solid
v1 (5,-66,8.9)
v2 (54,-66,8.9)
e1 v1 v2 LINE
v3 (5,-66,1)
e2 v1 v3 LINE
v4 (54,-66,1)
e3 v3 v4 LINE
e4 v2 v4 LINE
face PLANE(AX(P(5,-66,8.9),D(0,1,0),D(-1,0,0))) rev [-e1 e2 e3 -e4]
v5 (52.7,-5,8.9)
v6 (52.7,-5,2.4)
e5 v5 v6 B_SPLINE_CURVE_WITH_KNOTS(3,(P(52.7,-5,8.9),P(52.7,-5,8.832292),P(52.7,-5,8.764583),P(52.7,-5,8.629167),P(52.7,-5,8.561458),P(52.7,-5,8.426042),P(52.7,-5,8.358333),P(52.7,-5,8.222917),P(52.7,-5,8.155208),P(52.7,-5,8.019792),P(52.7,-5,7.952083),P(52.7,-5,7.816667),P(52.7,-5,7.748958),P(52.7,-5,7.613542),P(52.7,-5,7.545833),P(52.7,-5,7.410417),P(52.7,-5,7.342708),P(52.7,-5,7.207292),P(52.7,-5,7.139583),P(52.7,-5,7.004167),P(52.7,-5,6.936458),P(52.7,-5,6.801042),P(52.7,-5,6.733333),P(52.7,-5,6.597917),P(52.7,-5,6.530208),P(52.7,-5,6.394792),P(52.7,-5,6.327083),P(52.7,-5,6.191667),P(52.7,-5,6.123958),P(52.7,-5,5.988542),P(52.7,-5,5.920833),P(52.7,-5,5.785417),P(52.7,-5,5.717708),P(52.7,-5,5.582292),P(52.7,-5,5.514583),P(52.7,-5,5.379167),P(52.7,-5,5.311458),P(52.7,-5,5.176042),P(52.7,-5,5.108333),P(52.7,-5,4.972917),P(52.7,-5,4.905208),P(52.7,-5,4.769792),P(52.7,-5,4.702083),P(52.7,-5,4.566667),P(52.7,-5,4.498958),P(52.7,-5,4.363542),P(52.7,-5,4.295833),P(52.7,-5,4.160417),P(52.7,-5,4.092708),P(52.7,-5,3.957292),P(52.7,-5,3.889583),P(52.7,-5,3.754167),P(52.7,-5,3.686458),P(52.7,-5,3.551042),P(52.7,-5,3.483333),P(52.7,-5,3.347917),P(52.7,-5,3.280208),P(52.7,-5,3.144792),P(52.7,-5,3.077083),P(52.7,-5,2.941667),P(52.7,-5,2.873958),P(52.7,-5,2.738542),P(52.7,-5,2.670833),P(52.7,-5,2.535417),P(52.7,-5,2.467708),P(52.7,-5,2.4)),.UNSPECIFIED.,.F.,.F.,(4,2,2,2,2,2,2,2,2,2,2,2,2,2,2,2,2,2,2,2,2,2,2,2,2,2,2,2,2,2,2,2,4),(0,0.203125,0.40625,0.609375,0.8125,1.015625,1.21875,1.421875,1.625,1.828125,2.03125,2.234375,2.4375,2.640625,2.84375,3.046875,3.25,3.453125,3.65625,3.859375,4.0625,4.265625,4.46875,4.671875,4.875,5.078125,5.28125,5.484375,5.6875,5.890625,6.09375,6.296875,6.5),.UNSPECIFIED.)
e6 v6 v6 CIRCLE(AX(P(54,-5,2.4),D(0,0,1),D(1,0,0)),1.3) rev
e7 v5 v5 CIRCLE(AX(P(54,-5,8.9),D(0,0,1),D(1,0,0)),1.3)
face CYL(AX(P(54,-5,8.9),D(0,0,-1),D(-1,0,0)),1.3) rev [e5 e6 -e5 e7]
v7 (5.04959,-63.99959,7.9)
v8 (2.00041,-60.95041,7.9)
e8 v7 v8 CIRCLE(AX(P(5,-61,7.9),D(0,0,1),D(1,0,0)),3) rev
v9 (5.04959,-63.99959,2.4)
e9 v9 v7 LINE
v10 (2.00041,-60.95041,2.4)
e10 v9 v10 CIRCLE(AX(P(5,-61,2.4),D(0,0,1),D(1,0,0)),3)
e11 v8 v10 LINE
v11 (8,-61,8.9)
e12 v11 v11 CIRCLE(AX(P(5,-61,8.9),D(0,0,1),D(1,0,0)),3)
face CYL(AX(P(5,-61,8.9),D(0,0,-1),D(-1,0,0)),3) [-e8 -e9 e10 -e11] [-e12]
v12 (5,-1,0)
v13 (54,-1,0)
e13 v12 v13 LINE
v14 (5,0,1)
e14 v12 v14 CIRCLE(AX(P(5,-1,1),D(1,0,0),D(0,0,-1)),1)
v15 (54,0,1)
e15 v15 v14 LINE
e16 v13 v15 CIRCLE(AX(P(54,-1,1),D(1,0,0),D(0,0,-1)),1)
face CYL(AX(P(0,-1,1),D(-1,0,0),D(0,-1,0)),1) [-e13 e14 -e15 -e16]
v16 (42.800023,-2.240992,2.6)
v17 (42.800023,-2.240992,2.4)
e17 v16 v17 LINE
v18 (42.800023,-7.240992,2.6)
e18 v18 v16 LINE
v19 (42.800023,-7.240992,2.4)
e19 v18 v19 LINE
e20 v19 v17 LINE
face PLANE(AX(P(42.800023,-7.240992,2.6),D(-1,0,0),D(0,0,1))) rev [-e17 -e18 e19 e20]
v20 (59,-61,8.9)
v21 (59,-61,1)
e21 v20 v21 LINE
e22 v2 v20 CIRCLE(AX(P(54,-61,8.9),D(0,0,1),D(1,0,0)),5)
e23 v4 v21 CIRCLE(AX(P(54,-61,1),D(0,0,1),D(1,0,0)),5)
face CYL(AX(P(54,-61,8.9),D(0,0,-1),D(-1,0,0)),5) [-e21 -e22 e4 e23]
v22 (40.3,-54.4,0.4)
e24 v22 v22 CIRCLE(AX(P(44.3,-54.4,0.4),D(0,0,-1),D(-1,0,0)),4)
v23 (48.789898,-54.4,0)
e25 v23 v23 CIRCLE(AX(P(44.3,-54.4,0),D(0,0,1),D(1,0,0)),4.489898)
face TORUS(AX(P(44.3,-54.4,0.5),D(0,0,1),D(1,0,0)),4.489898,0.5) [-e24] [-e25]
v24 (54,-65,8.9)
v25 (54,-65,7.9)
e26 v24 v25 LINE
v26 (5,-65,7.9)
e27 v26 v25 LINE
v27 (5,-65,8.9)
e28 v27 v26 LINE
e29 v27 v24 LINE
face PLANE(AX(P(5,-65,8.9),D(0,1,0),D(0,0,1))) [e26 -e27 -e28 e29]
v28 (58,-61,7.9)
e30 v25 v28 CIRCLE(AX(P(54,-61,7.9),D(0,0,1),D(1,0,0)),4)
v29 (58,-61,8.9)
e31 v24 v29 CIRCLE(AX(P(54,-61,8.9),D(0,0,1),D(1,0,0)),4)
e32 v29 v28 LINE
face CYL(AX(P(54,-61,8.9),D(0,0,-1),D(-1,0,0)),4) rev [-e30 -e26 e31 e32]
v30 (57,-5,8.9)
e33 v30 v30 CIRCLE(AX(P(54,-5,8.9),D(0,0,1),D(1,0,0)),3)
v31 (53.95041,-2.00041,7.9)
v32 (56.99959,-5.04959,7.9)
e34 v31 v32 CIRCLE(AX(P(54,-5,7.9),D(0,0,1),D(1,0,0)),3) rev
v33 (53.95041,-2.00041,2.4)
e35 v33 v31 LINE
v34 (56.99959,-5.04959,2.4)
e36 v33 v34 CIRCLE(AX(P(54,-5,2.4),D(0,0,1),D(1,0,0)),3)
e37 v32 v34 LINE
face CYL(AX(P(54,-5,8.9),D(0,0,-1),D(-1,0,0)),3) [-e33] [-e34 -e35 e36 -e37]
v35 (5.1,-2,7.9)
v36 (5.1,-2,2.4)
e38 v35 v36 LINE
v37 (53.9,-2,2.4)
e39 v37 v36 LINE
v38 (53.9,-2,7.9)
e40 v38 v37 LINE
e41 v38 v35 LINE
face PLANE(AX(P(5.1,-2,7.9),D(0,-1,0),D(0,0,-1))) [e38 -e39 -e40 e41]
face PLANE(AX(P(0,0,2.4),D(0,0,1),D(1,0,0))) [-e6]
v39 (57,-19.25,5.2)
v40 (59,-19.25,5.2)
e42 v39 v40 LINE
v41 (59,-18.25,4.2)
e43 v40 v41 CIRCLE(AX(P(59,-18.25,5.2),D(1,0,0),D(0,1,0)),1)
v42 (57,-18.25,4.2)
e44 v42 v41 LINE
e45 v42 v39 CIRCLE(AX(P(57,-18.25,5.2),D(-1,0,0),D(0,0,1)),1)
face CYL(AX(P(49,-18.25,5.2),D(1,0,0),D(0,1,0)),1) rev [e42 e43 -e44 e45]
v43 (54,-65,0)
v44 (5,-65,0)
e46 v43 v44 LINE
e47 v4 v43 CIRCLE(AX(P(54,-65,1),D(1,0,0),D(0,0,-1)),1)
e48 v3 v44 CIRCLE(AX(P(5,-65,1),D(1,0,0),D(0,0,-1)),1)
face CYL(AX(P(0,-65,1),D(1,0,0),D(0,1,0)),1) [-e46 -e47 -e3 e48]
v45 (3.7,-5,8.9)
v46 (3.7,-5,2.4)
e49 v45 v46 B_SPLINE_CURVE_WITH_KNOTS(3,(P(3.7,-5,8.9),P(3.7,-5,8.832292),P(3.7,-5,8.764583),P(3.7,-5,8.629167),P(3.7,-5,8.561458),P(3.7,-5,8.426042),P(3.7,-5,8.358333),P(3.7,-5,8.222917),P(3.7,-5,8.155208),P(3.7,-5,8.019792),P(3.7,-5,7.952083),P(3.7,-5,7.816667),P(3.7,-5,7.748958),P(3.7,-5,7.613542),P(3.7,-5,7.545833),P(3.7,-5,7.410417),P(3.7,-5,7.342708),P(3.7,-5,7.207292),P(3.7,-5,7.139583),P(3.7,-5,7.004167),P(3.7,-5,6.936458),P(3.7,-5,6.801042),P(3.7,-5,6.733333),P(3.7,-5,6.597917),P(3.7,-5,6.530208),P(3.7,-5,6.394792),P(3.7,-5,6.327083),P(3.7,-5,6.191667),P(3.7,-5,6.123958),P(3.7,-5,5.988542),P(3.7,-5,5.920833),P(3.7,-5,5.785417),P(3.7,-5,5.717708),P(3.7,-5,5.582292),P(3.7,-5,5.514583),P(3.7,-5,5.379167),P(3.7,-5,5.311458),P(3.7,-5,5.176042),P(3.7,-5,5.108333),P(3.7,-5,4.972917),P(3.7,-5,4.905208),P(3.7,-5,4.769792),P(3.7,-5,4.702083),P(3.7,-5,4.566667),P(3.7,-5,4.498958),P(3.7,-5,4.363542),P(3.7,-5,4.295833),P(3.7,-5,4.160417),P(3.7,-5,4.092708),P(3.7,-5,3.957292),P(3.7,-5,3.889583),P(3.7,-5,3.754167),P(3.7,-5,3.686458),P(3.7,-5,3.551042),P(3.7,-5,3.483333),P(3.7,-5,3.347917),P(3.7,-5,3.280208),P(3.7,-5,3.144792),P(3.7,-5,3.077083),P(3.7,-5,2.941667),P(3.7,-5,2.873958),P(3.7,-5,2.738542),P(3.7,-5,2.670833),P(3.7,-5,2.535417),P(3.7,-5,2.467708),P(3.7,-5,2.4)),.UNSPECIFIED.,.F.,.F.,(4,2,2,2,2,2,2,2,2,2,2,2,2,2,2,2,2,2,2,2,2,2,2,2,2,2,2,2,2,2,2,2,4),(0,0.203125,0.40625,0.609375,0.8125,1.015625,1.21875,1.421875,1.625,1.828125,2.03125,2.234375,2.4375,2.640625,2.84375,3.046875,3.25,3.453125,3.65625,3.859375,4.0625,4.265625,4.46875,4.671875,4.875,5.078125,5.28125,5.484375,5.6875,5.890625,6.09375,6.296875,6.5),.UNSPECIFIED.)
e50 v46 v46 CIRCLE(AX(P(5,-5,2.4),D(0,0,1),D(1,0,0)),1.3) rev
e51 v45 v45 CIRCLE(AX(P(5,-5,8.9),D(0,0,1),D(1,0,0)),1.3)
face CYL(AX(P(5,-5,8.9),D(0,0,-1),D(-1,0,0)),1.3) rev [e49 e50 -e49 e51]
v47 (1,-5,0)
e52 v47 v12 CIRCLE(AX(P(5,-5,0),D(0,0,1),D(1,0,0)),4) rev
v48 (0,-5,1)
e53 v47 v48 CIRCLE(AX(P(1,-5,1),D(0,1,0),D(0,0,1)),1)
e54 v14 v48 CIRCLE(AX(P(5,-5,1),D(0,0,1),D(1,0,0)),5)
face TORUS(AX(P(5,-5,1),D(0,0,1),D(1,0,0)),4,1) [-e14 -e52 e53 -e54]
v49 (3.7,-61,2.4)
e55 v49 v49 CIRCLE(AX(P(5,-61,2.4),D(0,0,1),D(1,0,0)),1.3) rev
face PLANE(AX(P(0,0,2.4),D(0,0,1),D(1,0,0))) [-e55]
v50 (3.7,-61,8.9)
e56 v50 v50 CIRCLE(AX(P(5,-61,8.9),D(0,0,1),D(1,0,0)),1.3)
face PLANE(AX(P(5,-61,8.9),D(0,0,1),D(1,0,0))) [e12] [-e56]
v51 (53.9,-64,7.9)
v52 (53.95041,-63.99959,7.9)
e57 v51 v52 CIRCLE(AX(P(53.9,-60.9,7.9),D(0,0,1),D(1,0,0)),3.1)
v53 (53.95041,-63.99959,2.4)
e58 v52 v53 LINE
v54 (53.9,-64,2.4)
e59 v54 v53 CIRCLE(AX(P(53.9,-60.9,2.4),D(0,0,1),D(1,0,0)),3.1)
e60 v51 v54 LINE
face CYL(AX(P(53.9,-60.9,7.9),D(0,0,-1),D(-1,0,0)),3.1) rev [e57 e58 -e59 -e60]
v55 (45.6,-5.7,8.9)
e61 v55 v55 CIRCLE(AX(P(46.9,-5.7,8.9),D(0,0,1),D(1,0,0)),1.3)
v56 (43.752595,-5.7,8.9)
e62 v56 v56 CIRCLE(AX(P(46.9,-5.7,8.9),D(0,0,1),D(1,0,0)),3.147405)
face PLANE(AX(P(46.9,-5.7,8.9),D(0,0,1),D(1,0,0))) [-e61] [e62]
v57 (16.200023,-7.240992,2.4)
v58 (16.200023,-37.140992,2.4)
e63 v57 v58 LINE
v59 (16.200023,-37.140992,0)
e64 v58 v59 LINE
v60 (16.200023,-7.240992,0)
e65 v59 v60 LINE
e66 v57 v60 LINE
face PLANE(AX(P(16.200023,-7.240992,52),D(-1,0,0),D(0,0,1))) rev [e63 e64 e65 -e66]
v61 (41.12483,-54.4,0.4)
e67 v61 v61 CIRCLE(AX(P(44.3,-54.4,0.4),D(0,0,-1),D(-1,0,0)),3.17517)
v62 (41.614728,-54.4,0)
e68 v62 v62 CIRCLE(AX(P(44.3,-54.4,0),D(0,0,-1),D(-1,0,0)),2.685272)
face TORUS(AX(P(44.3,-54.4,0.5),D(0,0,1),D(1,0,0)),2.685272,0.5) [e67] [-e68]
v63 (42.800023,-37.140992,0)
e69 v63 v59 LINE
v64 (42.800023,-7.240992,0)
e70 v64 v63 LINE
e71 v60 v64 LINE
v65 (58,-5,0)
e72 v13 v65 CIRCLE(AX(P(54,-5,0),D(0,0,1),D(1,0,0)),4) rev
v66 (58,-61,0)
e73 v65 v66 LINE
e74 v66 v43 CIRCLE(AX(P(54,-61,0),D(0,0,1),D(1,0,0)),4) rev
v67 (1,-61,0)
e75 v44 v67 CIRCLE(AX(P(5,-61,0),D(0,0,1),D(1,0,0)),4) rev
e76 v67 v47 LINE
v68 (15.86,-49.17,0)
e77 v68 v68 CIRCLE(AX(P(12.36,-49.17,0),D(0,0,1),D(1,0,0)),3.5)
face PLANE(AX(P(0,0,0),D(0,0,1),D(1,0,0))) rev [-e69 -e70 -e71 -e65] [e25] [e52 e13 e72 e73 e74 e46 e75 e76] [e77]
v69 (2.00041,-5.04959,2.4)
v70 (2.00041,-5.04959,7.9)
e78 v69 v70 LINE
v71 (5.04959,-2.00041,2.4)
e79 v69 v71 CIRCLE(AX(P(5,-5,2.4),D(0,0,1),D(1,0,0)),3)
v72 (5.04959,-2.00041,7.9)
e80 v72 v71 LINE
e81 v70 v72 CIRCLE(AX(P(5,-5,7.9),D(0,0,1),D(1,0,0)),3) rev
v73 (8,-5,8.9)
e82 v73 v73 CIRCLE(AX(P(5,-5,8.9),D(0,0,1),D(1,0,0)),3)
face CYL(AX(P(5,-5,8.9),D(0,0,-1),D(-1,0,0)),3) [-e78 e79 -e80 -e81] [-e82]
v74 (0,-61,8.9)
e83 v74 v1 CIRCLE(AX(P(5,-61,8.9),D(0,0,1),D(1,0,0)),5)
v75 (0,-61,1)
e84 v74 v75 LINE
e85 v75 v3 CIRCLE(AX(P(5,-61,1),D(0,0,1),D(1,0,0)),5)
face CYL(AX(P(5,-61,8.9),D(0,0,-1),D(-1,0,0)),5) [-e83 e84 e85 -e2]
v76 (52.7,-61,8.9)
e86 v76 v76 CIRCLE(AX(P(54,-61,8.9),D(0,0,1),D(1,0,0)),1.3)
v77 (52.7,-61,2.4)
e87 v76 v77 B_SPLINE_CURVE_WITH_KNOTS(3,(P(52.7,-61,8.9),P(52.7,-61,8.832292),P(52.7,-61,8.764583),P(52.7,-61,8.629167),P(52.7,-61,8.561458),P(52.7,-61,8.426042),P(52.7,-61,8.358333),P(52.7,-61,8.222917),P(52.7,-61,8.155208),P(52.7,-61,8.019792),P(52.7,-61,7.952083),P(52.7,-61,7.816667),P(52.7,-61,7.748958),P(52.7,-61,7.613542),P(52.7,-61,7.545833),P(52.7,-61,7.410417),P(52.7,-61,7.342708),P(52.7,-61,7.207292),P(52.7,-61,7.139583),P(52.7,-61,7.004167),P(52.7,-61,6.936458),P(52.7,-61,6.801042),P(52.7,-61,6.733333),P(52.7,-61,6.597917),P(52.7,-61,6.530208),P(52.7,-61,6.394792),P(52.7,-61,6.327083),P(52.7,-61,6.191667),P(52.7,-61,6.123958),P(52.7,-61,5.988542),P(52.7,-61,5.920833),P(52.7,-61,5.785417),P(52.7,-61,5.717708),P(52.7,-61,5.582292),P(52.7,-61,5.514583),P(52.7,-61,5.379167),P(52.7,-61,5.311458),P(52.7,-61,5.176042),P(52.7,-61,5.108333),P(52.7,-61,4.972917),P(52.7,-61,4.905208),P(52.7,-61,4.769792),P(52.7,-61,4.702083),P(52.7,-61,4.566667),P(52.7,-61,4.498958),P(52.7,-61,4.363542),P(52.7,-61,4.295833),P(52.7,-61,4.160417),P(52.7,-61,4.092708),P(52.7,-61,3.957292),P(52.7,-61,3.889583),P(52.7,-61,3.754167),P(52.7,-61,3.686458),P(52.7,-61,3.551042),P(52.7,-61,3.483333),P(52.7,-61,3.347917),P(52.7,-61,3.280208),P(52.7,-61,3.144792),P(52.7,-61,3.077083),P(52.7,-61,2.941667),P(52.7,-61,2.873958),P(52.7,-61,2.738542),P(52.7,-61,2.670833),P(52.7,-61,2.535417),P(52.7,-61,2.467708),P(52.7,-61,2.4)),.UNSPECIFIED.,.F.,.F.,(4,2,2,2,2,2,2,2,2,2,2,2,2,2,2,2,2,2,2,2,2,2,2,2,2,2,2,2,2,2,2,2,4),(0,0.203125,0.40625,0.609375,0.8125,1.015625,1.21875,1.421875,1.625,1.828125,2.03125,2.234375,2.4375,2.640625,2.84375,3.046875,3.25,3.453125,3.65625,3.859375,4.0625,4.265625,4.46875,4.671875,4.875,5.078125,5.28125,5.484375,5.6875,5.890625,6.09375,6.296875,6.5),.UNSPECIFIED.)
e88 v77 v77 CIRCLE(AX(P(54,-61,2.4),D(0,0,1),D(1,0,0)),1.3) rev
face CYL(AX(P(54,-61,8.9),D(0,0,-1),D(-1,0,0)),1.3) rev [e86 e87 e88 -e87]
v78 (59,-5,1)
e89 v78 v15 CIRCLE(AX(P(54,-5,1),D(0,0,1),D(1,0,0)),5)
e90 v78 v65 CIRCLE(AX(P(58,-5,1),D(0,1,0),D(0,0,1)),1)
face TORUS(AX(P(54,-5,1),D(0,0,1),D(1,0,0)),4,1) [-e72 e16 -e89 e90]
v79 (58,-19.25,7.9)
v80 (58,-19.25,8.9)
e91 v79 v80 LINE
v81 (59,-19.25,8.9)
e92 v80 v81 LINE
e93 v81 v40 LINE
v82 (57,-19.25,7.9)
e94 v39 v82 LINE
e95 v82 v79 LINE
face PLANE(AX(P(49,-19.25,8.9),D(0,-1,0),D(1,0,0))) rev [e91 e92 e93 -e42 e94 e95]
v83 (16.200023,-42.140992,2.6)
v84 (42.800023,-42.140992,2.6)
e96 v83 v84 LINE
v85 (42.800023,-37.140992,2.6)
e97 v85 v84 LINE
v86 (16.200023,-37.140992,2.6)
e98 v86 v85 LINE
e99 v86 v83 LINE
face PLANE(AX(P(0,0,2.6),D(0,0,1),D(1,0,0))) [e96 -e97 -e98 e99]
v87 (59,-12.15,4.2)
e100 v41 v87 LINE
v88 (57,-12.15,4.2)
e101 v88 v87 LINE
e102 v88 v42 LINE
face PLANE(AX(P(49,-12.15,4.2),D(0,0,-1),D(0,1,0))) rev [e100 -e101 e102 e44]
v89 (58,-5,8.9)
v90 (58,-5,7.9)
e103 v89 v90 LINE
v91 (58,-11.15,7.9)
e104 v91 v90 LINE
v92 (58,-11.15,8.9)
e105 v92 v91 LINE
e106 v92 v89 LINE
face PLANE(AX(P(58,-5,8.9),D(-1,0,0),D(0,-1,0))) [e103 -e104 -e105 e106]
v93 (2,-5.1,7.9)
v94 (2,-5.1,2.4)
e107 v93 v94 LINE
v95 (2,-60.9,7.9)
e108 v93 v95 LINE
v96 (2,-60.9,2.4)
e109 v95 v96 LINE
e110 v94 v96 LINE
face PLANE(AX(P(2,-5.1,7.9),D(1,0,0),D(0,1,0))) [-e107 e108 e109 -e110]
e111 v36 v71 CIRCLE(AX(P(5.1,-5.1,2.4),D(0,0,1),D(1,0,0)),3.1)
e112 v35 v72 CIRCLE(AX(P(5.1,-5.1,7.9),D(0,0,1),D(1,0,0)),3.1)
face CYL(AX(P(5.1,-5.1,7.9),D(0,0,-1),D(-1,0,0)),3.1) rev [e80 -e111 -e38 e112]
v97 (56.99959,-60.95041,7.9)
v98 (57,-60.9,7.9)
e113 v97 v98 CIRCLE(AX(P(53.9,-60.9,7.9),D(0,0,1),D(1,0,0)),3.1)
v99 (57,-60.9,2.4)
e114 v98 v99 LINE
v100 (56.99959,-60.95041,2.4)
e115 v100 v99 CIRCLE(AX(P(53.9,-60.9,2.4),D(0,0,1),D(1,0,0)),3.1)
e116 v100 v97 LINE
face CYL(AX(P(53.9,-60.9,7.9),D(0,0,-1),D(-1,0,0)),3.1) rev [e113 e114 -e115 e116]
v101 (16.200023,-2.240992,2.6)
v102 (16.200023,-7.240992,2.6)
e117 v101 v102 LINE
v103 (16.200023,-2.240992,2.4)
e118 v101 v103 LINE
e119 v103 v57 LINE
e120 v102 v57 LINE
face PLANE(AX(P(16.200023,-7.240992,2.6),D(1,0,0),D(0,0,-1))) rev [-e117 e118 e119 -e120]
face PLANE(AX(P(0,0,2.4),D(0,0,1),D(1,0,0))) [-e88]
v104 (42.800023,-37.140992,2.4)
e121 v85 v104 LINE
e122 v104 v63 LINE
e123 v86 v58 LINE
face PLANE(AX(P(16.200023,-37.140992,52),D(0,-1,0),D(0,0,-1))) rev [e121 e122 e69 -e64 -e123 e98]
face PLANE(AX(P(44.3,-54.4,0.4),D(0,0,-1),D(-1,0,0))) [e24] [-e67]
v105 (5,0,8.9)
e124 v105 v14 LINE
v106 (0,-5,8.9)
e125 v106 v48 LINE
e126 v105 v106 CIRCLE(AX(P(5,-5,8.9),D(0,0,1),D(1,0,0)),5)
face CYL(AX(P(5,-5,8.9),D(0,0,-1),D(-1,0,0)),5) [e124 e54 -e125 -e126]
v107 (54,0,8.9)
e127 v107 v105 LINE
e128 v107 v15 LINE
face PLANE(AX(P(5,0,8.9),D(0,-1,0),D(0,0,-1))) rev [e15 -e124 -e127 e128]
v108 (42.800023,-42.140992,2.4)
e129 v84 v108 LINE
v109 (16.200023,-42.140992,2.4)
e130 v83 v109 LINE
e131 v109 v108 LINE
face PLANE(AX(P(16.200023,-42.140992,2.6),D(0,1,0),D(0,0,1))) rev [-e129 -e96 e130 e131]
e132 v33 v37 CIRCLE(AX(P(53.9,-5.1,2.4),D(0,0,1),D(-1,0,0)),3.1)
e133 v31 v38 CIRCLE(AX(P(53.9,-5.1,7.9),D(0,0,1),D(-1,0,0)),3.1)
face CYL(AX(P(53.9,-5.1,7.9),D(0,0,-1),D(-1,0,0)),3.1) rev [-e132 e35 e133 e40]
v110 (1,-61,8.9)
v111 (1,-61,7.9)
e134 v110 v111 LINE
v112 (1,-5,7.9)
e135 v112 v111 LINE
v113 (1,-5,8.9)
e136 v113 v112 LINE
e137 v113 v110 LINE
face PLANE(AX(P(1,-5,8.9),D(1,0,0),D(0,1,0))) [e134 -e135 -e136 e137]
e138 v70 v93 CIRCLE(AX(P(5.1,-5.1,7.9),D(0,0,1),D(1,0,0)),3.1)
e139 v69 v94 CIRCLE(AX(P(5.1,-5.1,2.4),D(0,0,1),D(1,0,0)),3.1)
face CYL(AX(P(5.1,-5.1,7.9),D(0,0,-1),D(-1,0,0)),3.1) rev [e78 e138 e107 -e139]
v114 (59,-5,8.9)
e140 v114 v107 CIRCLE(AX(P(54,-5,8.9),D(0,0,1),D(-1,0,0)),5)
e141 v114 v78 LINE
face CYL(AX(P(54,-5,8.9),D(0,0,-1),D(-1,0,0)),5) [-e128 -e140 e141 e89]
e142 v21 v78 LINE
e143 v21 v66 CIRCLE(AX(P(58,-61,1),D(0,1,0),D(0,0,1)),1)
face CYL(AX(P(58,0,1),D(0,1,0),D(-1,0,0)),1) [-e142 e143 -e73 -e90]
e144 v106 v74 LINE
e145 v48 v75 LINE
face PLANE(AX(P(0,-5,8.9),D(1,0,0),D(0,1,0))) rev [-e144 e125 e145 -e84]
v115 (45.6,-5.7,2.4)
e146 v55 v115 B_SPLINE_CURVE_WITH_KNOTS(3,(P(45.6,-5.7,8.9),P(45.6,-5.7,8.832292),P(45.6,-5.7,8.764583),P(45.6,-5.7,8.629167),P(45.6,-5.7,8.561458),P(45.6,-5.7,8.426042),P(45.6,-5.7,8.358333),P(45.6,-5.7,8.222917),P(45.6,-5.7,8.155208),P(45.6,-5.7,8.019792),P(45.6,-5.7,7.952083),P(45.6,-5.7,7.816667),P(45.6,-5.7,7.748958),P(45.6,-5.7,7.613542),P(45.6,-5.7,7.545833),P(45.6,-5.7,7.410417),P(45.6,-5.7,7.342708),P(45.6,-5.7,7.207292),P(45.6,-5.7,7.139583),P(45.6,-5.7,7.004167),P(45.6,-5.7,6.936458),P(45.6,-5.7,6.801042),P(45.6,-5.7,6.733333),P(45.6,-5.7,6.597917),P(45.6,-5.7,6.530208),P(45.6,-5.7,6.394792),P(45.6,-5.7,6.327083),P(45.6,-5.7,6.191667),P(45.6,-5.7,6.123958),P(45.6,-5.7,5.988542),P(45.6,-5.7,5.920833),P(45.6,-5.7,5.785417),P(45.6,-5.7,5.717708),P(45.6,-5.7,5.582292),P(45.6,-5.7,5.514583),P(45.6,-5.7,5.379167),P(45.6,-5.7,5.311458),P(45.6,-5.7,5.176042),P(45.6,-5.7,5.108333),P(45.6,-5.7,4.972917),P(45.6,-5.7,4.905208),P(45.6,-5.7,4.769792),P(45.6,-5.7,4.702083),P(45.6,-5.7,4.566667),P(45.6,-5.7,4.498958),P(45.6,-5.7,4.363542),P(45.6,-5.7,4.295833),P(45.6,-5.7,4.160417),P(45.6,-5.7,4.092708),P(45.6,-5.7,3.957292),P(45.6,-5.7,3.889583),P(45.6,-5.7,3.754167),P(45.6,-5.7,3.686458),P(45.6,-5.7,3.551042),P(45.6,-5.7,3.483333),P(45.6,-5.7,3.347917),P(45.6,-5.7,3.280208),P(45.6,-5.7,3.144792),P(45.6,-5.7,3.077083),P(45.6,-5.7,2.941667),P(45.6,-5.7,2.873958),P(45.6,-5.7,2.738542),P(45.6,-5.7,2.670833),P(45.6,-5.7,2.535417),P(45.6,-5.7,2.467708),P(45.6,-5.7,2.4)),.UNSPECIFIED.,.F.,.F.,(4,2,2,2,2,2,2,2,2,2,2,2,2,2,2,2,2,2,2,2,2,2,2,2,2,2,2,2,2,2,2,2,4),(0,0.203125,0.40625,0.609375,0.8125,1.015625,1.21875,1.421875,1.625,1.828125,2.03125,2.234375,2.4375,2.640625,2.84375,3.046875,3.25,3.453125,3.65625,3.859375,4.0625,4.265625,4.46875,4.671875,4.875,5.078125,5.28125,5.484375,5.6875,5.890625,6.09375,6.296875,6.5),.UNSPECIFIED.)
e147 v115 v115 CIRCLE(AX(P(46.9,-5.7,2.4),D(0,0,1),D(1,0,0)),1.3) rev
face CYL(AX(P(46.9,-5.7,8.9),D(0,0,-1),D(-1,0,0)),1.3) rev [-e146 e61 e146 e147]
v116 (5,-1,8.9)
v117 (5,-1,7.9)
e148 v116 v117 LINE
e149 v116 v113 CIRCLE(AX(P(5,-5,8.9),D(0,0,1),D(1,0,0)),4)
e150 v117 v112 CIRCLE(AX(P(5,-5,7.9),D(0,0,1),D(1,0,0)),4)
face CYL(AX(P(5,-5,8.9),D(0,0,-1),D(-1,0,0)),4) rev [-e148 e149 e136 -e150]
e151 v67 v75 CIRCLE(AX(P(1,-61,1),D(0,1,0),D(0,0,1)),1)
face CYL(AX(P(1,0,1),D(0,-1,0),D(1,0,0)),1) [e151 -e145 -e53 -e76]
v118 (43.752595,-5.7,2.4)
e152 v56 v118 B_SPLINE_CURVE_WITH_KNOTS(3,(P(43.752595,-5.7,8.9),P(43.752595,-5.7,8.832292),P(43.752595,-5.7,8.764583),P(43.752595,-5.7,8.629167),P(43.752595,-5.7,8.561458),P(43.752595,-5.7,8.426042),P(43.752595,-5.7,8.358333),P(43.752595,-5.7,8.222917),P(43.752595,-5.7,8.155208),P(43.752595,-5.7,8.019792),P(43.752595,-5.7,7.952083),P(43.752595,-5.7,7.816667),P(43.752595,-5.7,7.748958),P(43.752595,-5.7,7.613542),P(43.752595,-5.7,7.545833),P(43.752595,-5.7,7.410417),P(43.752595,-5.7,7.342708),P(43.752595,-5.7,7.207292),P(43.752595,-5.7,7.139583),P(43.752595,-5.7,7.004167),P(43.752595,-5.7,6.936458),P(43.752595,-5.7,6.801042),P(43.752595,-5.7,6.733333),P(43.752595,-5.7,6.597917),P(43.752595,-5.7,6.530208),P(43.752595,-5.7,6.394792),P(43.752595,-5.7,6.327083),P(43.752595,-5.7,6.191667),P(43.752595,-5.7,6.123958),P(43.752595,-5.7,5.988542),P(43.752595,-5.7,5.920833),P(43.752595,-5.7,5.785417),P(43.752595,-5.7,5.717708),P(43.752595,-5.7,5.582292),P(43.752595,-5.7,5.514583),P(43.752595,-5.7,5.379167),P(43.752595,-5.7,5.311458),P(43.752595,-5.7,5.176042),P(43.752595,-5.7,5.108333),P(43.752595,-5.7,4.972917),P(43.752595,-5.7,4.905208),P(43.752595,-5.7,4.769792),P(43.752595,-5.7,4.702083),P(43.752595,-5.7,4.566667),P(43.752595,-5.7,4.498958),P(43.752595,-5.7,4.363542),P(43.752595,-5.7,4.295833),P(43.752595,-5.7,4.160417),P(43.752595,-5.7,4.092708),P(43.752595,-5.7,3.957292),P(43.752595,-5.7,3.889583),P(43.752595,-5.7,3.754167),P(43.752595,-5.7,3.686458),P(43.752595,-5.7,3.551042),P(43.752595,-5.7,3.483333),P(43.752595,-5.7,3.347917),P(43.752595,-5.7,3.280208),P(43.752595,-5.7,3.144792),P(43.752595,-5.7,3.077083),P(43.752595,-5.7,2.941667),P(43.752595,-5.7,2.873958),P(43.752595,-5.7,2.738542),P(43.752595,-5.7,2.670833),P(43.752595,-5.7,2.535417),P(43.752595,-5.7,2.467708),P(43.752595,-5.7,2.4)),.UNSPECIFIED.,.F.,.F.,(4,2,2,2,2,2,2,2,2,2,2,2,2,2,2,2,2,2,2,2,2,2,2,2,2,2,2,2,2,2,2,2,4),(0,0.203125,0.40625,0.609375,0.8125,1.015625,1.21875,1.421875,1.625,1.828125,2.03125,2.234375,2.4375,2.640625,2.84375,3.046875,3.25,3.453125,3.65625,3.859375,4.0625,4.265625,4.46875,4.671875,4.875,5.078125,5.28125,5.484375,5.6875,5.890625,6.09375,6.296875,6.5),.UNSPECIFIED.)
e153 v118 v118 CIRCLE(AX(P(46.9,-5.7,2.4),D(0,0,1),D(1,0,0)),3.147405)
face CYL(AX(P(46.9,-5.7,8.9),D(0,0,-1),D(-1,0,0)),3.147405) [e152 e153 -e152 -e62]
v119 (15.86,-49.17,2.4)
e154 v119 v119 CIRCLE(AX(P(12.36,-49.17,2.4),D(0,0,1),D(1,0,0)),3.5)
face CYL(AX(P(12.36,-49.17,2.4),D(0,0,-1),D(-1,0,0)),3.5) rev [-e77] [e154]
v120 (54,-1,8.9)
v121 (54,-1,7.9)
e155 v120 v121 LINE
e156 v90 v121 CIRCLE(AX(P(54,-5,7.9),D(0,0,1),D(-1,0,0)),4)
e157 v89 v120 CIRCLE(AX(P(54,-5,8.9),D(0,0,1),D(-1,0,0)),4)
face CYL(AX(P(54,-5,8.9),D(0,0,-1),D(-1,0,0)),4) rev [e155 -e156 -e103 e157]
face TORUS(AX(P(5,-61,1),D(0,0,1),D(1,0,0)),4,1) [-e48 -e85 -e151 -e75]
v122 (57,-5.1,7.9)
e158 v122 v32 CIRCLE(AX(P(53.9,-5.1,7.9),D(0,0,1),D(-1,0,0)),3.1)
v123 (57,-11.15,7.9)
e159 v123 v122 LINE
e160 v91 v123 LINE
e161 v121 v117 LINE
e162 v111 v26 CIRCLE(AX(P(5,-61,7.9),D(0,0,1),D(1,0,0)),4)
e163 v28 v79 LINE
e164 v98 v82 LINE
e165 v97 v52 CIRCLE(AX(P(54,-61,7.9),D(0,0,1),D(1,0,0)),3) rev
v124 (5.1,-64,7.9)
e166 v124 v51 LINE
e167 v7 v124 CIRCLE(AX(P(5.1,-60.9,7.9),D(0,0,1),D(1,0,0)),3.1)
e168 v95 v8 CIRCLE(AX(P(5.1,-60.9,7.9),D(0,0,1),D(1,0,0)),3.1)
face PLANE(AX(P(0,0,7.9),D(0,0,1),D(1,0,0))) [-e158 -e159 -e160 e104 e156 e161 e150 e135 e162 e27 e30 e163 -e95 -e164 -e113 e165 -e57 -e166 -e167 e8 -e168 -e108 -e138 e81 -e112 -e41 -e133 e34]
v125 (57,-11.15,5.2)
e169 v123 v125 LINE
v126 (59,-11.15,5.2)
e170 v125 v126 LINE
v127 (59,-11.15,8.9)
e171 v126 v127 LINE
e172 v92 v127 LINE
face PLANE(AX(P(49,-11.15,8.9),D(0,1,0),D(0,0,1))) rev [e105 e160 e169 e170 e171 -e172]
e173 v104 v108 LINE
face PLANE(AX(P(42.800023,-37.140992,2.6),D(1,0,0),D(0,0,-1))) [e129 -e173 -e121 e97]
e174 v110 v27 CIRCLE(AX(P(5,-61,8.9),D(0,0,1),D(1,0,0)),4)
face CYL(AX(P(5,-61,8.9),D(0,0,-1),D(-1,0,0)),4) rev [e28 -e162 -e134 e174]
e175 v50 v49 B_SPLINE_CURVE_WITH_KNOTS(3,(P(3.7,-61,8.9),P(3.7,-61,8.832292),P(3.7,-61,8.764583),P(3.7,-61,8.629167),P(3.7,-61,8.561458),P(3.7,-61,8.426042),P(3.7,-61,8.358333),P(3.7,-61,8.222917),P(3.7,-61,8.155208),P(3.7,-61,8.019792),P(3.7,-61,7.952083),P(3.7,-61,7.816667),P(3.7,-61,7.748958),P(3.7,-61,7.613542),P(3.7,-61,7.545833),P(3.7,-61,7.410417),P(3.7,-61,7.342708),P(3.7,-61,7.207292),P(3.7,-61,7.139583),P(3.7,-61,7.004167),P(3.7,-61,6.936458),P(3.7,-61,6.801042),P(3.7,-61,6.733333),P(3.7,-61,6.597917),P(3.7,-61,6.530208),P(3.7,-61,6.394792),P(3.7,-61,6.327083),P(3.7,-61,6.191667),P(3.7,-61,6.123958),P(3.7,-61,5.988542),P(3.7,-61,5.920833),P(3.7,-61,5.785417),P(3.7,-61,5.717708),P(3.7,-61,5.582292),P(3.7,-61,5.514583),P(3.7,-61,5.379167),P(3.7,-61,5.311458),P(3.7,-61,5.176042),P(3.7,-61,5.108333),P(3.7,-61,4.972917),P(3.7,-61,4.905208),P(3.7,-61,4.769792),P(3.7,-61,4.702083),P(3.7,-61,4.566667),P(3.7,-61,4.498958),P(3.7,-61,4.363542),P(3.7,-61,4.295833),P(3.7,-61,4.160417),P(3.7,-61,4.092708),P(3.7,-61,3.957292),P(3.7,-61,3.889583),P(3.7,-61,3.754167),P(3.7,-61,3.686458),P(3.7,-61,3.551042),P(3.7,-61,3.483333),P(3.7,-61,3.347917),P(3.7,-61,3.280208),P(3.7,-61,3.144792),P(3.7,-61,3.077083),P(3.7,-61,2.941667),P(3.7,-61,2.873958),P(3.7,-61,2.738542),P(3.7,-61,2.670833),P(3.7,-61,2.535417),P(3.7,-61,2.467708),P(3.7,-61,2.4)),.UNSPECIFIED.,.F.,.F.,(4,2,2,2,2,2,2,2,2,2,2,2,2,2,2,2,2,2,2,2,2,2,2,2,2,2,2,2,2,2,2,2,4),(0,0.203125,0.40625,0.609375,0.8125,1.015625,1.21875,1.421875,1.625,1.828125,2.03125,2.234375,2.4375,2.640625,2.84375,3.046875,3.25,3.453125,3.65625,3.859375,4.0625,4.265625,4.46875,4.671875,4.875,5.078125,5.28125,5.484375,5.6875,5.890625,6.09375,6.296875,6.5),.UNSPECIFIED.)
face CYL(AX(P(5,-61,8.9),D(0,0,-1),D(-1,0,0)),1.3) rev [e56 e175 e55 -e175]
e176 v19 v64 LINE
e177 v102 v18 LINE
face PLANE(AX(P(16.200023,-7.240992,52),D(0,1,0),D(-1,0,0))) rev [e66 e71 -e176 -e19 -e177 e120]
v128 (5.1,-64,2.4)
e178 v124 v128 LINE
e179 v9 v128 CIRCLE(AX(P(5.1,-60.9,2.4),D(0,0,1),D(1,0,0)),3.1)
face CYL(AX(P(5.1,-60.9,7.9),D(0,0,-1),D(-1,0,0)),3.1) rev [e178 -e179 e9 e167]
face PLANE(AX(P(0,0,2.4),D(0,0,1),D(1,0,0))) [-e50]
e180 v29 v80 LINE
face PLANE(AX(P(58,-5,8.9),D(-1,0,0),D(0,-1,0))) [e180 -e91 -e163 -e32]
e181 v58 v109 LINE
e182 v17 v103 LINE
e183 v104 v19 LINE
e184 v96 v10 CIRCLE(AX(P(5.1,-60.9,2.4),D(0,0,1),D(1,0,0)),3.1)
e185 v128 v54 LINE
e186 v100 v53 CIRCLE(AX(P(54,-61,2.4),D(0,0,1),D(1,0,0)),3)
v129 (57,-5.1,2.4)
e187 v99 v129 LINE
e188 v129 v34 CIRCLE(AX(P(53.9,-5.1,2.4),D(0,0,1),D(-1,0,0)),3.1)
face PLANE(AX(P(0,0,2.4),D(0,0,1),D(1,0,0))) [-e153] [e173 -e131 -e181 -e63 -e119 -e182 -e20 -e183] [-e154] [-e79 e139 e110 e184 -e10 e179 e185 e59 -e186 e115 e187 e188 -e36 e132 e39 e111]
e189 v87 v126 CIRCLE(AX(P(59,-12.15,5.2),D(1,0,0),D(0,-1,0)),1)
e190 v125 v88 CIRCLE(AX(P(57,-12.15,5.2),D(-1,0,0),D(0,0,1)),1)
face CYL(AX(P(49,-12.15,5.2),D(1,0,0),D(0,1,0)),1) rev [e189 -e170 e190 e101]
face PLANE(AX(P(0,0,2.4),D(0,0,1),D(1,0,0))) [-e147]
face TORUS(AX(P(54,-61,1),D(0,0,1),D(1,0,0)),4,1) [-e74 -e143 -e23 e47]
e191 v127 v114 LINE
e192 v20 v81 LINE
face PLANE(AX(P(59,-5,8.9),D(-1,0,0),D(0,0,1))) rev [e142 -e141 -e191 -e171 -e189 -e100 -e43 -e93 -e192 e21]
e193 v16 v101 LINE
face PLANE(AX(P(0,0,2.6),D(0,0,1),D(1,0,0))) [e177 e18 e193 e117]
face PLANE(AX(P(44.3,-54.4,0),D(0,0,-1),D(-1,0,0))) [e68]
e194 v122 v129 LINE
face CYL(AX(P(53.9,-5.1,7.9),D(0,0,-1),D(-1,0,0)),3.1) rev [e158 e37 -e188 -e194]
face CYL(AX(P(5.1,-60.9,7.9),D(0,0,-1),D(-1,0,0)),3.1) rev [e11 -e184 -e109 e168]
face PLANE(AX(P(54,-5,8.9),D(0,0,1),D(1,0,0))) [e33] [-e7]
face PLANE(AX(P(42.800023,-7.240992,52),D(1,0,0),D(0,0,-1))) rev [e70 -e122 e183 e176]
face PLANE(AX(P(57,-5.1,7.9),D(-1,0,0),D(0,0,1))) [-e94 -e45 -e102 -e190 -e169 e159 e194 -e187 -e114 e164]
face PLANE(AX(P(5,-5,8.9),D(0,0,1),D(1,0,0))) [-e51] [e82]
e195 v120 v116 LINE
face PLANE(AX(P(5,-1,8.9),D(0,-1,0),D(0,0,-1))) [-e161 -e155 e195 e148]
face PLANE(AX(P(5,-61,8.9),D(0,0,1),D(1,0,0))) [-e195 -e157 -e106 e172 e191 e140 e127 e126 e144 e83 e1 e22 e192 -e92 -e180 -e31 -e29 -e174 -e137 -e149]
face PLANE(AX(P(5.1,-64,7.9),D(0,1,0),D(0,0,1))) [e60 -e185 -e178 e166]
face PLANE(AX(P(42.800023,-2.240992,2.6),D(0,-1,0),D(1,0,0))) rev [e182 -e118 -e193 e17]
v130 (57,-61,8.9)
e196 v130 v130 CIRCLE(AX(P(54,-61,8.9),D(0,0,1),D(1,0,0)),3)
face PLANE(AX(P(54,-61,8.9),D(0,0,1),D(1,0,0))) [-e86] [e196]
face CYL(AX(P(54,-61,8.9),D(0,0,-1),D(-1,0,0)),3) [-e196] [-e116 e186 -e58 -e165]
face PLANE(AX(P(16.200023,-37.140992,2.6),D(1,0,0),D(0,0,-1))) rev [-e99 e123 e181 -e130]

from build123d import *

# Parameters (mm, degrees)
SKETCH_1_W          = 59
SKETCH_1_H          = 66
SKETCH_1_R          = 3.5
EXTRUDE_1_DEPTH     = 2.4
SKETCH_4_W          = 59
SKETCH_4_H          = 66
EXTRUDE_6_DEPTH     = 5.5
FILLET_1_R          = 5
FILLET_2_R          = 5
SKETCH_14_R         = 3
SKETCH_14_R_2       = 1.3
EXTRUDE_7_DEPTH     = 6.5
EXTRUDE_10_DEPTH    = 1
FILLET_3_R          = 1
CUT_EXTRUDE_1_DEPTH = 10
SKETCH_23_W         = 26.6
SKETCH_23_H         = 29.9
CUT_EXTRUDE_4_DEPTH = 52
SKETCH_24_W         = 26.6
SKETCH_24_H         = 5
EXTRUDE_11_DEPTH    = 0.2
SKETCH_25_W         = 26.6
SKETCH_25_H         = 5
EXTRUDE_12_DEPTH    = 0.2
SKETCH_26_R         = 3.14740537
SKETCH_26_R_2       = 1.3
EXTRUDE_13_DEPTH    = 6.5
SKETCH_27_R         = 4
CUT_EXTRUDE_5_DEPTH = 0.4
SKETCH_28_R         = 3.175170102
EXTRUDE_14_DEPTH    = 0.4
FILLET_4_R          = 0.5
FILLET_5_R          = 0.5


with BuildPart() as part:
    # Эскиз1 → Бобышка-Вытянуть1 (new body)
    with BuildSketch(Plane.XY):
        with Locations((29.5, -33)):
            Rectangle(SKETCH_1_W, SKETCH_1_H)
        with Locations((12.36, -49.17)):
            Circle(SKETCH_1_R, mode=Mode.SUBTRACT)
    extrude(amount=EXTRUDE_1_DEPTH)

    # Эскиз4 → Бобышка-Вытянуть6 (add)
    with BuildSketch(Plane.XY.offset(2.4)):
        with Locations((29.5, -33)):
            Rectangle(SKETCH_4_W, SKETCH_4_H)
        with BuildLine():
            Line((5.1, -2), (53.9, -2))
            ThreePointArc((53.9, -2), (56.092031022, -2.907968978), (57, -5.1))
            Line((57, -5.1), (57, -60.9))
            ThreePointArc((57, -60.9), (56.092031022, -63.092031022), (53.9, -64))
            Line((53.9, -64), (5.1, -64))
            ThreePointArc((5.1, -64), (2.907968978, -63.092031022), (2, -60.9))
            Line((2, -60.9), (2, -5.1))
            ThreePointArc((2, -5.1), (2.907968978, -2.907968978), (5.1, -2))
        make_face(mode=Mode.SUBTRACT)
    extrude(amount=EXTRUDE_6_DEPTH)

    # Скругление1
    fillet_1_edges = [part.edges().sort_by_distance(p)[0] for p in [
        (0, 0, 3.95),
    ]]
    fillet(fillet_1_edges, radius=FILLET_1_R)

    # Скругление2
    fillet_2_edges = [part.edges().sort_by_distance(p)[0] for p in [
        (59, 0, 3.95),
        (59, -66, 3.95),
        (0, -66, 3.95),
    ]]
    fillet(fillet_2_edges, radius=FILLET_2_R)

    # Эскиз14 → Бобышка-Вытянуть7 (add)
    # profile 1 of 4: a face of its own
    with BuildSketch(Plane.XY.offset(2.4)):
        with Locations(Location((5, -5, 0), (0, 0, 180.947144451))):
            Circle(SKETCH_14_R)
        with Locations(Location((5, -5, 0), (0, 0, 180))):
            Circle(SKETCH_14_R_2, mode=Mode.SUBTRACT)
    # profile 2 of 4: a face of its own
    with BuildSketch(Plane.XY.offset(2.4)):
        with Locations(Location((5, -61, 0), (0, 0, 179.052855549))):
            Circle(SKETCH_14_R)
        with Locations(Location((5, -61, 0), (0, 0, 180))):
            Circle(SKETCH_14_R_2, mode=Mode.SUBTRACT)
    # profile 3 of 4: a face of its own
    with BuildSketch(Plane.XY.offset(2.4)):
        with Locations(Location((54, -61, 0), (0, 0, 269.052855549))):
            Circle(SKETCH_14_R)
        with Locations(Location((54, -61, 0), (0, 0, 180))):
            Circle(SKETCH_14_R_2, mode=Mode.SUBTRACT)
    # profile 4 of 4: a face of its own
    with BuildSketch(Plane.XY.offset(2.4)):
        with Locations(Location((54, -5, 0), (0, 0, 90.947144451))):
            Circle(SKETCH_14_R)
        with Locations(Location((54, -5, 0), (0, 0, 180))):
            Circle(SKETCH_14_R_2, mode=Mode.SUBTRACT)
    extrude(amount=EXTRUDE_7_DEPTH)

    # Скругление3
    fillet_3_edges = [part.edges().sort_by_distance(p)[0] for p in [
        (0, -33, 0),
        (1.464466094, -1.464466094, 0),
        (29.5, -66, 0),
        (29.5, 0, 0),
        (59, -33, 0),
        (57.535533906, -1.464466094, 0),
        (57.535533906, -64.535533906, 0),
        (1.464466094, -64.535533906, 0),
    ]]
    fillet(fillet_3_edges, radius=FILLET_3_R)


with BuildPart() as body_2:
    # Эскиз15 → Бобышка-Вытянуть10 (new body)
    with BuildSketch(Plane.XY.offset(7.9)):
        with BuildLine():
            Line((5, 0), (54, 0))
            ThreePointArc((54, 0), (57.535533906, -1.464466094), (59, -5))
            Line((59, -5), (59, -61))
            ThreePointArc((59, -61), (57.535533906, -64.535533906), (54, -66))
            Line((54, -66), (5, -66))
            ThreePointArc((5, -66), (1.464466094, -64.535533906), (0, -61))
            Line((0, -61), (0, -5))
            ThreePointArc((0, -5), (1.464466094, -1.464466094), (5, 0))
        make_face()
        with BuildLine():
            Line((5, -1), (54, -1))
            ThreePointArc((54, -1), (56.828427125, -2.171572875), (58, -5))
            Line((58, -5), (58, -61))
            ThreePointArc((58, -61), (56.828427125, -63.828427125), (54, -65))
            Line((54, -65), (5, -65))
            ThreePointArc((5, -65), (2.171572875, -63.828427125), (1, -61))
            Line((1, -61), (1, -5))
            ThreePointArc((1, -5), (2.171572875, -2.171572875), (5, -1))
        make_face(mode=Mode.SUBTRACT)
    extrude(amount=EXTRUDE_10_DEPTH)


with BuildPart() as cut_extrude_1_tool:
    # Эскиз20 → Вырез-Вытянуть1 (new body)
    with BuildSketch(Plane(origin=(59, 0, 0), x_dir=(0, 0, -1), z_dir=(1, 0, 0))):
        with BuildLine():
            Line((-8.9, -11.15), (-5.2, -11.15))
            ThreePointArc((-5.2, -11.15), (-4.492893219, -11.442893219), (-4.2, -12.15))
            Line((-4.2, -12.15), (-4.2, -18.25))
            ThreePointArc((-4.2, -18.25), (-4.492893219, -18.957106781), (-5.2, -19.25))
            Line((-5.2, -19.25), (-8.9, -19.25))
            Line((-8.9, -19.25), (-8.9, -11.15))
        make_face()
    extrude(amount=-CUT_EXTRUDE_1_DEPTH)


with BuildPart() as part_1:
    add(part.part)

    # Вырез-Вытянуть1: cut by cut_extrude_1_tool
    add(cut_extrude_1_tool.part, mode=Mode.SUBTRACT)

    # Эскиз23 → Вырез-Вытянуть4 (cut)
    with BuildSketch(Plane(origin=(0, 0, 0), x_dir=(-1, 0, 0), z_dir=(0, 0, -1))):
        with Locations((-29.500023272, -22.190991649)):
            Rectangle(SKETCH_23_W, SKETCH_23_H)
    extrude(amount=-CUT_EXTRUDE_4_DEPTH, mode=Mode.SUBTRACT)

    # Эскиз24 → Бобышка-Вытянуть11 (add)
    with BuildSketch(Plane.XY.offset(2.4)):
        with Locations((29.500023272, -4.740991649)):
            Rectangle(SKETCH_24_W, SKETCH_24_H)
    extrude(amount=EXTRUDE_11_DEPTH)

    # Эскиз25 → Бобышка-Вытянуть12 (add)
    with BuildSketch(Plane.XY.offset(2.4)):
        with Locations((29.500023272, -39.640991649)):
            Rectangle(SKETCH_25_W, SKETCH_25_H)
    extrude(amount=EXTRUDE_12_DEPTH)


with BuildPart() as body_2_1:
    add(body_2.part)

    # Вырез-Вытянуть1: cut by cut_extrude_1_tool
    add(cut_extrude_1_tool.part, mode=Mode.SUBTRACT)


    add(part_1.part)  # Бобышка-Вытянуть13 merges part
    # Эскиз26 → Бобышка-Вытянуть13 (add)
    with BuildSketch(Plane.XY.offset(2.4)):
        with Locations(Location((46.9, -5.7, 0), (0, 0, 180))):
            Circle(SKETCH_26_R)
        with Locations(Location((46.9, -5.7, 0), (0, 0, 180))):
            Circle(SKETCH_26_R_2, mode=Mode.SUBTRACT)
    extrude(amount=EXTRUDE_13_DEPTH)

    # Эскиз27 → Вырез-Вытянуть5 (cut)
    with BuildSketch(Plane(origin=(0, 0, 0), x_dir=(-1, 0, 0), z_dir=(0, 0, -1))):
        with Locations((-44.3, -54.4)):
            Circle(SKETCH_27_R)
    extrude(amount=-CUT_EXTRUDE_5_DEPTH, mode=Mode.SUBTRACT)

    # Эскиз28 → Бобышка-Вытянуть14 (add)
    with BuildSketch(Plane(origin=(0, 0, 0.4), x_dir=(-1, 0, 0), z_dir=(0, 0, -1))):
        with Locations((-44.3, -54.4)):
            Circle(SKETCH_28_R)
    extrude(amount=EXTRUDE_14_DEPTH)

    # Скругление4
    # the kernel refuses this fillet: 0.5 mm, written as the material it takes off along each edge
    with BuildSketch(Plane(origin=(44.3, -54.4, 0), x_dir=(-1, 0, 0), z_dir=(0, -1, 0))) as fillet_4_piece_1:
        with BuildLine():
            CenterArc((4.489897949, -0.5), FILLET_4_R, 90, 78.463040967)
            Line((4, -0.4), (3.990202041, -0.398))
            ThreePointArc((3.990202041, -0.398), (3.99, -0.2), (3.99, 0))
            Line((3.99, 0), (4, 0.01))
            Line((4, 0.01), (4.489897949, 0.01))
            Line((4.489897949, 0.01), (4.489897949, 0))
        make_face()
    revolve(axis=Axis((44.3, -54.4, 0), (0, 0, -1)), mode=Mode.SUBTRACT)

    # Скругление5
    # the kernel refuses this fillet: 0.5 mm, written as the material it takes off along each edge
    with BuildSketch(Plane(origin=(44.3, -54.4, 0), x_dir=(-1, 0, 0), z_dir=(0, -1, 0))) as fillet_5_piece_1:
        with BuildLine():
            CenterArc((2.685272154, -0.5), FILLET_5_R, 11.536959033, 78.463040967)
            Line((2.685272154, 0), (2.685272154, 0.01))
            Line((2.685272154, 0.01), (3.175170102, 0.01))
            Line((3.175170102, 0.01), (3.185170102, 0))
            ThreePointArc((3.185170102, 0), (3.185170102, -0.2), (3.184968061, -0.398))
            Line((3.184968061, -0.398), (3.175170102, -0.4))
        make_face()
    revolve(axis=Axis((44.3, -54.4, 0), (0, 0, -1)), mode=Mode.SUBTRACT)


solid = body_2_1.part
